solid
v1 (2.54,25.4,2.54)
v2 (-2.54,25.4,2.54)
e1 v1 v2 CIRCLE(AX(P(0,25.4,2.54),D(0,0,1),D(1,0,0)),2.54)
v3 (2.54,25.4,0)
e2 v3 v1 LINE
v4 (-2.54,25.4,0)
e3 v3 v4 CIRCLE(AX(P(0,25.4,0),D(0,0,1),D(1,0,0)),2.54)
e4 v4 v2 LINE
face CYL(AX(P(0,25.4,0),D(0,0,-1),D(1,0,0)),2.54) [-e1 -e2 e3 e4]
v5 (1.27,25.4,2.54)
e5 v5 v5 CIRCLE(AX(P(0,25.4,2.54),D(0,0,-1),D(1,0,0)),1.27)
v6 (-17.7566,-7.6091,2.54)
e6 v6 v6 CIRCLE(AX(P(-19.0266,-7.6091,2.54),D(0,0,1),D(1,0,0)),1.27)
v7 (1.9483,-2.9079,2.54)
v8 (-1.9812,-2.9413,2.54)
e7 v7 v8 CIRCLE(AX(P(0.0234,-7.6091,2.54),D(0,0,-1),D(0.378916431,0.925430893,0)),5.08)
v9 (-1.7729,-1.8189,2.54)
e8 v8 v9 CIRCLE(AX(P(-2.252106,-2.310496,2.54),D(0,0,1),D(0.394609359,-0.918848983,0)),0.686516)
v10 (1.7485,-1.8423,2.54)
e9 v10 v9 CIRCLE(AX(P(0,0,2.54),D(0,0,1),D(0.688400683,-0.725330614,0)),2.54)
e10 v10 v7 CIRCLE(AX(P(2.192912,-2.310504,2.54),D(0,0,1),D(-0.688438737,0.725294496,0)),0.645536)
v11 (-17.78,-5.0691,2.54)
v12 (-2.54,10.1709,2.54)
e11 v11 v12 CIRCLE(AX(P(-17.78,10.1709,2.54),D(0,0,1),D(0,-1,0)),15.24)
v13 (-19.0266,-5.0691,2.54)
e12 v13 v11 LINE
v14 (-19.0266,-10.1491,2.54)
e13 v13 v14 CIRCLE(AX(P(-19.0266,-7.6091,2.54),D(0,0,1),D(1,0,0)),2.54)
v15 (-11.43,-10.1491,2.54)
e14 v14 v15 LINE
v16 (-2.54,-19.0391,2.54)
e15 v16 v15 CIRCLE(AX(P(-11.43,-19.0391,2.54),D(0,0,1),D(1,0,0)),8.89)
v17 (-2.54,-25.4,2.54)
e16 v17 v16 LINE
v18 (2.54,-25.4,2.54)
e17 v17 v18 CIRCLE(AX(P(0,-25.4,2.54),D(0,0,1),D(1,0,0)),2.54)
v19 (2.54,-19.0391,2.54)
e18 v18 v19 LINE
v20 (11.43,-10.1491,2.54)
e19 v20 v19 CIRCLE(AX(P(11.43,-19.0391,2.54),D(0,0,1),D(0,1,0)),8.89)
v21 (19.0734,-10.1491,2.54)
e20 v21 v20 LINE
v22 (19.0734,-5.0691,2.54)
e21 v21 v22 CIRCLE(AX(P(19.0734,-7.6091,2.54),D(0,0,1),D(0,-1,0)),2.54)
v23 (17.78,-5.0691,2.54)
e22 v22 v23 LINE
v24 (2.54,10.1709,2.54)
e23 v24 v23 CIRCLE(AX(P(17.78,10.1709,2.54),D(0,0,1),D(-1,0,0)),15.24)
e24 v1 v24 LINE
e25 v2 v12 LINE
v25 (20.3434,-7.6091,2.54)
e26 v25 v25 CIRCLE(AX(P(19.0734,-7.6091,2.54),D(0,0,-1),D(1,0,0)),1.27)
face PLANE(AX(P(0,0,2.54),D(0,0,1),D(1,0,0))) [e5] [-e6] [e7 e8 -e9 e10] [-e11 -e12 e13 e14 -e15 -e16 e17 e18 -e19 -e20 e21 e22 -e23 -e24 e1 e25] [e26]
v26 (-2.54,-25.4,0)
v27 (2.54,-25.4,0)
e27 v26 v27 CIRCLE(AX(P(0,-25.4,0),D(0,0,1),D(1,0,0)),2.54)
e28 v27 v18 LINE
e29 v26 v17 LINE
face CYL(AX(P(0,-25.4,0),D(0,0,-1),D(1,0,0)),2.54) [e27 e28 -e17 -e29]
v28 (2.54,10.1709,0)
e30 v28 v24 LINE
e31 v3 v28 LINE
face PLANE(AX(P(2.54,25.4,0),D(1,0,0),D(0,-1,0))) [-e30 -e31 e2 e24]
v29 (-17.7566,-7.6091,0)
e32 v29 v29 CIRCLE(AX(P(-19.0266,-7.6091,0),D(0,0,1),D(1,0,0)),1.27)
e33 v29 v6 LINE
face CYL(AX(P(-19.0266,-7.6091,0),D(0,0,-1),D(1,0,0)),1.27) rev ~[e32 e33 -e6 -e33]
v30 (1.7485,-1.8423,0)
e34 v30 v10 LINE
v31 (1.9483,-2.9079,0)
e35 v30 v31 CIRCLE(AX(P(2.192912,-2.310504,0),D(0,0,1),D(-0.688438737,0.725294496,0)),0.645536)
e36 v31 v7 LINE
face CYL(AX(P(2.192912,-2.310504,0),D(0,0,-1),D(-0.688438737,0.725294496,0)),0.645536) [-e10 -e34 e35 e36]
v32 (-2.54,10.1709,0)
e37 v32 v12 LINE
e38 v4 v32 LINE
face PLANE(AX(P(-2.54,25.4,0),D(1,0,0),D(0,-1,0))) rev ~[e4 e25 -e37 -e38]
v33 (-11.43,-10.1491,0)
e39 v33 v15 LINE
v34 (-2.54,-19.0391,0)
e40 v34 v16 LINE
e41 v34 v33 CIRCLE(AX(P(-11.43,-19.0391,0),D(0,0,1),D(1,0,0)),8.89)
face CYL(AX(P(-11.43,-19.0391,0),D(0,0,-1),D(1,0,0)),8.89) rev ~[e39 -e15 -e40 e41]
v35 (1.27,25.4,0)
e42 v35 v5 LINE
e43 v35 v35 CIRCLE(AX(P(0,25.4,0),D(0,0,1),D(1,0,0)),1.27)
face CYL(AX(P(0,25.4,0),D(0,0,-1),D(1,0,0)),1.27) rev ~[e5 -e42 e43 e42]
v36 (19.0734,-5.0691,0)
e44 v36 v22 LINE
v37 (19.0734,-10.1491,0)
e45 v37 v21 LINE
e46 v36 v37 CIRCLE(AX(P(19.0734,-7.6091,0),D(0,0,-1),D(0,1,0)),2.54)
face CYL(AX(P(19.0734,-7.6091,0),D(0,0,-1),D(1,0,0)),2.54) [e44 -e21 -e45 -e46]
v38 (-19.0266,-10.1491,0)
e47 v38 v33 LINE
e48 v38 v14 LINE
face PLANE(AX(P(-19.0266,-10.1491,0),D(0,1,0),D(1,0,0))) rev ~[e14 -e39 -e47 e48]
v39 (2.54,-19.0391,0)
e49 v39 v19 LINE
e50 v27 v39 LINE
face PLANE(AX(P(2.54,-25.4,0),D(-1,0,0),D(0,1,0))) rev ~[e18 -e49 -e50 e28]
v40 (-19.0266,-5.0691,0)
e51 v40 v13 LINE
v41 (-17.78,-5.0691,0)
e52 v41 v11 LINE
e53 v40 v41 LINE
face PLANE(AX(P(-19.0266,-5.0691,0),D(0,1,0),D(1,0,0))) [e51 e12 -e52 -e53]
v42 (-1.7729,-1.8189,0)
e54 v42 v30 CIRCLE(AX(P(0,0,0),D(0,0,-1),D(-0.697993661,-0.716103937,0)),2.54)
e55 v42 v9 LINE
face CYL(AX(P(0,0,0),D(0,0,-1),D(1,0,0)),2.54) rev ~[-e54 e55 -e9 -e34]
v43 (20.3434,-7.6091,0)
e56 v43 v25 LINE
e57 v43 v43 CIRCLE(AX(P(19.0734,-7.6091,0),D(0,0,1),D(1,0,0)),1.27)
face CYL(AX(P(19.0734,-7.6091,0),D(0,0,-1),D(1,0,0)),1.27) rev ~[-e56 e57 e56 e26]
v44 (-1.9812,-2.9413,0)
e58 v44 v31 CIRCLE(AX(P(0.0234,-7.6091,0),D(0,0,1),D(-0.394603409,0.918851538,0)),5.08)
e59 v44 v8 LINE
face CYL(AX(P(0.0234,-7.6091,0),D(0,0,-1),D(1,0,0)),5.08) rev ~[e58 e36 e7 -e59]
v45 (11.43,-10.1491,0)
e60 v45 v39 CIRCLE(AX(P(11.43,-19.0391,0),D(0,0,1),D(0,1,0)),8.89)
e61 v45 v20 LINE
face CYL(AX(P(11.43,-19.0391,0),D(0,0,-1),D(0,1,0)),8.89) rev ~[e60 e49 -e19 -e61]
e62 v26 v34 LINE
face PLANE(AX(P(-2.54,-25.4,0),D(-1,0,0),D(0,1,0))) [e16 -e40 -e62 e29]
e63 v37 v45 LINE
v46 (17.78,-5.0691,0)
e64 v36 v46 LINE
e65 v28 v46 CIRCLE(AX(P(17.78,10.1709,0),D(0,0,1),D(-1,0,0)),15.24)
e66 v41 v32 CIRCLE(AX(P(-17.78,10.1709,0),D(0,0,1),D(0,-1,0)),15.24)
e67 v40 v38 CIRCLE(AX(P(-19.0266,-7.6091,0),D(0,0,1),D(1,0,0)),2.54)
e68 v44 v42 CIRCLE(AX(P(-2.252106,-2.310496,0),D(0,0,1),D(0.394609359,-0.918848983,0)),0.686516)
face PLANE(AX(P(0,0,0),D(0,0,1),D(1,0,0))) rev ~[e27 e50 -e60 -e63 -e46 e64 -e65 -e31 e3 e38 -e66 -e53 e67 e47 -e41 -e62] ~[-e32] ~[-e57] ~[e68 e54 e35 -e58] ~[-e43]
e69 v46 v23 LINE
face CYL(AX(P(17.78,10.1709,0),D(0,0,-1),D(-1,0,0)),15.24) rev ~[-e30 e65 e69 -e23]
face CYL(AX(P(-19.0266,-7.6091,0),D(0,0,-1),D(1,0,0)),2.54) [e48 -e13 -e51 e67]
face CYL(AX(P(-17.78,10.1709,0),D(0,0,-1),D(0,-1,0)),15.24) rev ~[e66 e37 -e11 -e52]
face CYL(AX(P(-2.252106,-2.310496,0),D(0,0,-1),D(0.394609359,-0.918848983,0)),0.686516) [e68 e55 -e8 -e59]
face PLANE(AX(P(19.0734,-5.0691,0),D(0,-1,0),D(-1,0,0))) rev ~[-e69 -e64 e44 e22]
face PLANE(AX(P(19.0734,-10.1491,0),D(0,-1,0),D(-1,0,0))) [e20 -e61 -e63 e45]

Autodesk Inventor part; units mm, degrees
ref_plane "YZ Plane" through (0, 0, 0) normal (1, 0, 0) x (0, 1, 0)
ref_plane "XZ Plane" through (0, 0, 0) normal (0, 1, 0) x (-1, 0, 0)
ref_plane "XY Plane" through (0, 0, 0) normal (0, 0, 1) x (1, 0, 0)
sketch "Sketch1" plane through (0, 0, 0) normal (0, 0, 1) x (1, 0, 0)
  line L0 (0, 0) -> (0, 25.4)
  line L1 (0, 0) -> (0, -25.4)
  line L2 (-19.0266, -7.6091) -> (19.0734, -7.6091)
  circle A0 centre (0, 0) radius 2.54
  circle A1 centre (0, 25.4) radius 2.54
  circle A2 centre (-19.0266, -7.6091) radius 2.54
  circle A3 centre (19.0734, -7.6091) radius 2.54
  circle A4 centre (0, -25.4) radius 2.54
  circle A5 centre (0.0234, -7.6091) radius 5.08
  arc A6 (-1.9812, -2.9413) -> (-1.7729, -1.8189) centre (-2.2521, -2.3105) ccw
  arc A7 (1.7485, -1.8423) -> (1.9483, -2.9079) centre (2.1929, -2.3105) ccw
  line L3 (-2.54, 25.4) -> (-2.54, 10.1709)
  line L4 (2.54, 25.4) -> (2.54, 10.1709)
  line L5 (-2.54, -25.4) -> (-2.54, -19.0391)
  line L6 (2.54, -25.4) -> (2.54, -19.0391)
  line L7 (19.0734, -10.1491) -> (11.43, -10.1491)
  line L8 (19.0734, -5.0691) -> (17.78, -5.0691)
  line L9 (-19.0266, -5.0691) -> (-17.78, -5.0691)
  line L10 (-19.0266, -10.1491) -> (-11.43, -10.1491)
  arc A8 (-17.78, -5.0691) -> (-2.54, 10.1709) centre (-17.78, 10.1709) ccw
  arc A9 (2.54, 10.1709) -> (17.78, -5.0691) centre (17.78, 10.1709) ccw
  arc A10 (-2.54, -19.0391) -> (-11.43, -10.1491) centre (-11.43, -19.0391) ccw
  arc A11 (11.43, -10.1491) -> (2.54, -19.0391) centre (11.43, -19.0391) ccw
  circle A12 centre (-19.0266, -7.6091) radius 1.27
  circle A13 centre (0, 25.4) radius 1.27
  circle A14 centre (19.0734, -7.6091) radius 1.27
  dimension "d0" = 25.4
  dimension "d1" = 25.4
  dimension "d2" = 38.1
  dimension "d3" = 38.1
  dimension "d5" = 5.08
  dimension "d6" = 5.08
  dimension "d7" = 5.08
  dimension "d8" = 5.08
  dimension "d9" = 7.6091
  dimension "d10" = 5.08
  dimension "d12" = 4.445
  dimension "d13" = 35.56
  dimension "d14" = 22.86
  dimension "d15" = 10.16
  dimension "d16" = 2.54
  dimension "d17" = 2.54
  dimension "d18" = 2.54
extrude "Extrusion1" add sketch "Sketch1" along normal blind 2.54 contours A0 A6 A5 L2 A2 L9 A8 L3 A1 L0 | L0 A1 L4 A9 L8 A3 L2 A5 A7 A0 | A1 | A5 L1 A4 L5 A10 L10 A2 L2 | A5 L2 A3 L7 A11 L6 A4 L1 | A2 | A4 | A3
properties part number "Fish Rib"
